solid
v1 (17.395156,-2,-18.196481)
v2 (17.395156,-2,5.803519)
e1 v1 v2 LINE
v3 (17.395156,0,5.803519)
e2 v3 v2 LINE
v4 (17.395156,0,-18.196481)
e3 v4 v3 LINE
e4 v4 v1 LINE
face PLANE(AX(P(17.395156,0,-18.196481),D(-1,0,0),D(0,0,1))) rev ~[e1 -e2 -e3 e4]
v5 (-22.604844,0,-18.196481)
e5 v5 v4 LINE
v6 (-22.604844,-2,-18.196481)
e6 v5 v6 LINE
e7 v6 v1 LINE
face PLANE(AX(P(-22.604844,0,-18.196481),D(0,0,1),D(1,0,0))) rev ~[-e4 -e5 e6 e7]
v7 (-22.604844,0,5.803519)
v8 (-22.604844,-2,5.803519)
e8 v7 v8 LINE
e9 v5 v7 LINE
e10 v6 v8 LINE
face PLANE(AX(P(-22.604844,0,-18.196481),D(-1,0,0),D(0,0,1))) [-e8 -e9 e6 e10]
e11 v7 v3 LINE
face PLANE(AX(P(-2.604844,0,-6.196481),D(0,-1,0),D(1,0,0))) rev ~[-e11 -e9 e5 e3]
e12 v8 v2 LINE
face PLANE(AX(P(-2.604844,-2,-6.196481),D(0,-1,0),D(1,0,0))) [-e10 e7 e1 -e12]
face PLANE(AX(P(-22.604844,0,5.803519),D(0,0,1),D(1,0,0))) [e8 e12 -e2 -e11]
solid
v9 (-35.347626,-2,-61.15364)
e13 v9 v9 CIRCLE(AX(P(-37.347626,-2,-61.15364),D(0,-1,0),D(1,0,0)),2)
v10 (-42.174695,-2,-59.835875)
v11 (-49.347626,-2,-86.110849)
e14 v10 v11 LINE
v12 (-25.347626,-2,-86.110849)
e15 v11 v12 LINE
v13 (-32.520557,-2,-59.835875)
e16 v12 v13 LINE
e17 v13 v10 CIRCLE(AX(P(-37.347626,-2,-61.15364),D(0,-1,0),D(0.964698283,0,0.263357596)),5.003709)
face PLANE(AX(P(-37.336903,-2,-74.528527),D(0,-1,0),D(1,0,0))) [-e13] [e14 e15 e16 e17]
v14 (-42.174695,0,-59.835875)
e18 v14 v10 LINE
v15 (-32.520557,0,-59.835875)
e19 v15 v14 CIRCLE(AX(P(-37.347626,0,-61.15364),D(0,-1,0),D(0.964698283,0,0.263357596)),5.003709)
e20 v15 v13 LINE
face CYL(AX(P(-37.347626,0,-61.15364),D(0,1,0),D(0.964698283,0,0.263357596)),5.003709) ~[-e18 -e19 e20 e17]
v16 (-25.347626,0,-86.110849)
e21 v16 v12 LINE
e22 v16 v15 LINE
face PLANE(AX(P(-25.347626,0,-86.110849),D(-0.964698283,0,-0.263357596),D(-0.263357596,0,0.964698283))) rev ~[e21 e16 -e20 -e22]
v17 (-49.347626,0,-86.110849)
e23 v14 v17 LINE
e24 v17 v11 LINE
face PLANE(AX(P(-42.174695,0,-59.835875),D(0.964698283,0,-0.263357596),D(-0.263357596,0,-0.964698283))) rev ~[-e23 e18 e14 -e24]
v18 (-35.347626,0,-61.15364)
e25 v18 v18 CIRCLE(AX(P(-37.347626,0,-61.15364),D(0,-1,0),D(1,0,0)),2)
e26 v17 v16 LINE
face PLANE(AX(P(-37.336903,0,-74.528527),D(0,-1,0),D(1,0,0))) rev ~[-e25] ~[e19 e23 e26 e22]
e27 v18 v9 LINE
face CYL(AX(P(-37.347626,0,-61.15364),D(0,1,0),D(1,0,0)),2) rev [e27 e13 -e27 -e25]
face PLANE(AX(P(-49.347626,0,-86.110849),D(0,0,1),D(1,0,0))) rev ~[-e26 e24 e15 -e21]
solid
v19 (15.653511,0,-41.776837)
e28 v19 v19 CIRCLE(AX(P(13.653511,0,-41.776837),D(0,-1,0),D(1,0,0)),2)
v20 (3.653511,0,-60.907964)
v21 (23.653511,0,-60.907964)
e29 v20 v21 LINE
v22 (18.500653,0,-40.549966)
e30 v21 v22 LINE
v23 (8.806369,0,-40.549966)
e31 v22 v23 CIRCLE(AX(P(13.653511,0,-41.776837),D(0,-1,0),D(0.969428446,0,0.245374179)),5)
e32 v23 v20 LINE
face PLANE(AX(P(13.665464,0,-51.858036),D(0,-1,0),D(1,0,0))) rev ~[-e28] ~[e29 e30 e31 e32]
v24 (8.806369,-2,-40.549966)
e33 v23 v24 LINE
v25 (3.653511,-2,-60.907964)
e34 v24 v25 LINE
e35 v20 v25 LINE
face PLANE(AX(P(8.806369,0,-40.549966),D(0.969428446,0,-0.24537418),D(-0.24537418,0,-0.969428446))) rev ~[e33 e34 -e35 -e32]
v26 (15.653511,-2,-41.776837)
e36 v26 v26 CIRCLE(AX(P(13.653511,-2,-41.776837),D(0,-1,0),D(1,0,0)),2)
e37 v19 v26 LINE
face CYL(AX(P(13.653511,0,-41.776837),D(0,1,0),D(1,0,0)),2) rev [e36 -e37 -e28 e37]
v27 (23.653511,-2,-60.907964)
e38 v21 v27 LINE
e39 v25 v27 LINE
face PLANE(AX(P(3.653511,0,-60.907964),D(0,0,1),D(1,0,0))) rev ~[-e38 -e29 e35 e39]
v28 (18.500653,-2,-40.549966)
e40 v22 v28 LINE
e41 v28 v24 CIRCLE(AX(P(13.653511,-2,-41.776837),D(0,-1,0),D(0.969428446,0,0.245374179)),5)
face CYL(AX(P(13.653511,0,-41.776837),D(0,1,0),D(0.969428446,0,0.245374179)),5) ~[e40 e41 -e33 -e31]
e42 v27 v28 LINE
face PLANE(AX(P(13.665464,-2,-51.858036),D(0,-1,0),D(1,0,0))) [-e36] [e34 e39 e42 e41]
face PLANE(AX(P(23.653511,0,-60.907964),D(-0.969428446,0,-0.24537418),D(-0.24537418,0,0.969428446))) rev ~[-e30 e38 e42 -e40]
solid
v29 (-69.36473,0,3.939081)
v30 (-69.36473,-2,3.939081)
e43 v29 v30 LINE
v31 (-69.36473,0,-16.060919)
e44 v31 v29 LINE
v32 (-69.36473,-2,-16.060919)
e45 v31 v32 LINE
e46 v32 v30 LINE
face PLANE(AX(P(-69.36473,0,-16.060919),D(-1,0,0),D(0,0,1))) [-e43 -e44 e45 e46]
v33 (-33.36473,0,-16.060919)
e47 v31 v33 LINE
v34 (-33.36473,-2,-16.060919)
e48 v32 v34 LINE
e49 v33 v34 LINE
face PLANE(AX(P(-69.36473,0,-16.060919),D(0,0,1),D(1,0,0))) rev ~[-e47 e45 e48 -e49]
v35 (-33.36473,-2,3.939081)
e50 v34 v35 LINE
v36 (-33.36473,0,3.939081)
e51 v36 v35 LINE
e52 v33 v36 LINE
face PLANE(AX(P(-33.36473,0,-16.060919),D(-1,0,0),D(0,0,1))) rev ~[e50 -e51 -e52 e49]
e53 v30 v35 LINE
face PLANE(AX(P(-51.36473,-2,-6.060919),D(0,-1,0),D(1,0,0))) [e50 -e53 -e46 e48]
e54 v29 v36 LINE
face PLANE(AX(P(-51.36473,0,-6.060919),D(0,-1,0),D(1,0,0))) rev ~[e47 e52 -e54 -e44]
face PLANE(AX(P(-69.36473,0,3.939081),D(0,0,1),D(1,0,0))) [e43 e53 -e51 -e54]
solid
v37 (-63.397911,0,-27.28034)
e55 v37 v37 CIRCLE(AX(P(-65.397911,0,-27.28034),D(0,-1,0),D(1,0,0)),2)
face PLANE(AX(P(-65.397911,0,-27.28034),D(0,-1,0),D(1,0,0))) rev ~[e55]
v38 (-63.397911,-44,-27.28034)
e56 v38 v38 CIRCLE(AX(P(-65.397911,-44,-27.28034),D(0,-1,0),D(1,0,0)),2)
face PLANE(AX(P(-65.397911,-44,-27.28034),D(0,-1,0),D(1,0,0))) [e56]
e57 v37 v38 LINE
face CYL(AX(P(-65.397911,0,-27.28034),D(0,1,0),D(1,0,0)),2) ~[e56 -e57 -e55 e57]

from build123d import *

# Parameters (mm, degrees)
F0_W     = 40
F0_H     = 24
F1_DEPTH = 2
F2_R     = 2
F3_DEPTH = 2
F4_R     = 2
F5_DEPTH = 44
F6_W     = 36
F6_H     = 20
F7_DEPTH = 2
F8_R     = 2
F9_DEPTH = 2


# Not quite as in the source:
# - a feature of the source that left no trace in its solid (it failed there, or was rolled back) is left out


with BuildPart() as f1:
    # F0 (on Front) → F1 (new body)
    with BuildSketch(Plane.XZ):
        with Locations((-2.604843583, -6.1964805115)):
            Rectangle(F0_W, F0_H)
    extrude(amount=F1_DEPTH)


with BuildPart() as f3:
    # F2 (on Front) → F3 (new body)
    with BuildSketch(Plane.XZ):
        with BuildLine():
            Line((-42.1746947658, -59.8358749318), (-49.3476256423, -86.1108493255))
            Line((-49.3476256423, -86.1108493255), (-25.3476256423, -86.1108493255))
            Line((-25.3476256423, -86.1108493255), (-32.5205565188, -59.8358749318))
            ThreePointArc((-32.5205565188, -59.8358749318), (-32.3882734917, -60.4888642222), (-32.3439170108, -61.1536396093))
            ThreePointArc((-32.3439170108, -61.1536396093), (-38.0124010294, -66.1129917599), (-42.1746947658, -59.8358749318))
        make_face()
        with BuildLine():
            ThreePointArc((-32.5205565188, -59.8358749318), (-37.3476256423, -56.1499309779), (-42.1746947658, -59.8358749318))
            ThreePointArc((-42.1746947658, -59.8358749318), (-38.0124010294, -66.1129917599), (-32.3439170108, -61.1536396093))
            ThreePointArc((-32.3439170108, -61.1536396093), (-32.3882734917, -60.4888642222), (-32.5205565188, -59.8358749318))
        make_face()
        with Locations((-37.3476256423, -61.1536396093)):
            Circle(F2_R, mode=Mode.SUBTRACT)
    extrude(amount=F3_DEPTH)


with BuildPart() as f5:
    # F4 (on Front) → F5 (new body)
    with BuildSketch(Plane.XZ):
        with Locations((-65.3979107738, -27.2803399712)):
            Circle(F4_R)
    extrude(amount=F5_DEPTH)


with BuildPart() as f7:
    # F6 (on Front) → F7 (new body)
    with BuildSketch(Plane.XZ):
        with Locations((-51.3647299066, -6.0609190166)):
            Rectangle(F6_W, F6_H)
    extrude(amount=F7_DEPTH)


with BuildPart() as f9:
    # F8 (on Front) → F9 (new body)
    with BuildSketch(Plane.XZ):
        with BuildLine():
            Line((8.8063688133, -40.5499661908), (3.6535110436, -60.907963558))
            Line((3.6535110436, -60.907963558), (23.6535110436, -60.907963558))
            Line((23.6535110436, -60.907963558), (18.5006532739, -40.5499661908))
            ThreePointArc((18.5006532739, -40.5499661908), (18.6151494399, -41.1586587773), (18.6535110436, -41.7768370883))
            ThreePointArc((18.6535110436, -41.7768370883), (13.0353327326, -46.7384754847), (8.8063688133, -40.5499661908))
        make_face()
        with BuildLine():
            ThreePointArc((18.5006532739, -40.5499661908), (13.6535110436, -36.7768370883), (8.8063688133, -40.5499661908))
            ThreePointArc((8.8063688133, -40.5499661908), (13.0353327326, -46.7384754847), (18.6535110436, -41.7768370883))
            ThreePointArc((18.6535110436, -41.7768370883), (18.6151494399, -41.1586587773), (18.5006532739, -40.5499661908))
        make_face()
        with Locations((13.6535110436, -41.7768370883)):
            Circle(F8_R, mode=Mode.SUBTRACT)
    extrude(amount=F9_DEPTH)


solid = Compound([f1.part, f3.part, f5.part, f7.part, f9.part])
